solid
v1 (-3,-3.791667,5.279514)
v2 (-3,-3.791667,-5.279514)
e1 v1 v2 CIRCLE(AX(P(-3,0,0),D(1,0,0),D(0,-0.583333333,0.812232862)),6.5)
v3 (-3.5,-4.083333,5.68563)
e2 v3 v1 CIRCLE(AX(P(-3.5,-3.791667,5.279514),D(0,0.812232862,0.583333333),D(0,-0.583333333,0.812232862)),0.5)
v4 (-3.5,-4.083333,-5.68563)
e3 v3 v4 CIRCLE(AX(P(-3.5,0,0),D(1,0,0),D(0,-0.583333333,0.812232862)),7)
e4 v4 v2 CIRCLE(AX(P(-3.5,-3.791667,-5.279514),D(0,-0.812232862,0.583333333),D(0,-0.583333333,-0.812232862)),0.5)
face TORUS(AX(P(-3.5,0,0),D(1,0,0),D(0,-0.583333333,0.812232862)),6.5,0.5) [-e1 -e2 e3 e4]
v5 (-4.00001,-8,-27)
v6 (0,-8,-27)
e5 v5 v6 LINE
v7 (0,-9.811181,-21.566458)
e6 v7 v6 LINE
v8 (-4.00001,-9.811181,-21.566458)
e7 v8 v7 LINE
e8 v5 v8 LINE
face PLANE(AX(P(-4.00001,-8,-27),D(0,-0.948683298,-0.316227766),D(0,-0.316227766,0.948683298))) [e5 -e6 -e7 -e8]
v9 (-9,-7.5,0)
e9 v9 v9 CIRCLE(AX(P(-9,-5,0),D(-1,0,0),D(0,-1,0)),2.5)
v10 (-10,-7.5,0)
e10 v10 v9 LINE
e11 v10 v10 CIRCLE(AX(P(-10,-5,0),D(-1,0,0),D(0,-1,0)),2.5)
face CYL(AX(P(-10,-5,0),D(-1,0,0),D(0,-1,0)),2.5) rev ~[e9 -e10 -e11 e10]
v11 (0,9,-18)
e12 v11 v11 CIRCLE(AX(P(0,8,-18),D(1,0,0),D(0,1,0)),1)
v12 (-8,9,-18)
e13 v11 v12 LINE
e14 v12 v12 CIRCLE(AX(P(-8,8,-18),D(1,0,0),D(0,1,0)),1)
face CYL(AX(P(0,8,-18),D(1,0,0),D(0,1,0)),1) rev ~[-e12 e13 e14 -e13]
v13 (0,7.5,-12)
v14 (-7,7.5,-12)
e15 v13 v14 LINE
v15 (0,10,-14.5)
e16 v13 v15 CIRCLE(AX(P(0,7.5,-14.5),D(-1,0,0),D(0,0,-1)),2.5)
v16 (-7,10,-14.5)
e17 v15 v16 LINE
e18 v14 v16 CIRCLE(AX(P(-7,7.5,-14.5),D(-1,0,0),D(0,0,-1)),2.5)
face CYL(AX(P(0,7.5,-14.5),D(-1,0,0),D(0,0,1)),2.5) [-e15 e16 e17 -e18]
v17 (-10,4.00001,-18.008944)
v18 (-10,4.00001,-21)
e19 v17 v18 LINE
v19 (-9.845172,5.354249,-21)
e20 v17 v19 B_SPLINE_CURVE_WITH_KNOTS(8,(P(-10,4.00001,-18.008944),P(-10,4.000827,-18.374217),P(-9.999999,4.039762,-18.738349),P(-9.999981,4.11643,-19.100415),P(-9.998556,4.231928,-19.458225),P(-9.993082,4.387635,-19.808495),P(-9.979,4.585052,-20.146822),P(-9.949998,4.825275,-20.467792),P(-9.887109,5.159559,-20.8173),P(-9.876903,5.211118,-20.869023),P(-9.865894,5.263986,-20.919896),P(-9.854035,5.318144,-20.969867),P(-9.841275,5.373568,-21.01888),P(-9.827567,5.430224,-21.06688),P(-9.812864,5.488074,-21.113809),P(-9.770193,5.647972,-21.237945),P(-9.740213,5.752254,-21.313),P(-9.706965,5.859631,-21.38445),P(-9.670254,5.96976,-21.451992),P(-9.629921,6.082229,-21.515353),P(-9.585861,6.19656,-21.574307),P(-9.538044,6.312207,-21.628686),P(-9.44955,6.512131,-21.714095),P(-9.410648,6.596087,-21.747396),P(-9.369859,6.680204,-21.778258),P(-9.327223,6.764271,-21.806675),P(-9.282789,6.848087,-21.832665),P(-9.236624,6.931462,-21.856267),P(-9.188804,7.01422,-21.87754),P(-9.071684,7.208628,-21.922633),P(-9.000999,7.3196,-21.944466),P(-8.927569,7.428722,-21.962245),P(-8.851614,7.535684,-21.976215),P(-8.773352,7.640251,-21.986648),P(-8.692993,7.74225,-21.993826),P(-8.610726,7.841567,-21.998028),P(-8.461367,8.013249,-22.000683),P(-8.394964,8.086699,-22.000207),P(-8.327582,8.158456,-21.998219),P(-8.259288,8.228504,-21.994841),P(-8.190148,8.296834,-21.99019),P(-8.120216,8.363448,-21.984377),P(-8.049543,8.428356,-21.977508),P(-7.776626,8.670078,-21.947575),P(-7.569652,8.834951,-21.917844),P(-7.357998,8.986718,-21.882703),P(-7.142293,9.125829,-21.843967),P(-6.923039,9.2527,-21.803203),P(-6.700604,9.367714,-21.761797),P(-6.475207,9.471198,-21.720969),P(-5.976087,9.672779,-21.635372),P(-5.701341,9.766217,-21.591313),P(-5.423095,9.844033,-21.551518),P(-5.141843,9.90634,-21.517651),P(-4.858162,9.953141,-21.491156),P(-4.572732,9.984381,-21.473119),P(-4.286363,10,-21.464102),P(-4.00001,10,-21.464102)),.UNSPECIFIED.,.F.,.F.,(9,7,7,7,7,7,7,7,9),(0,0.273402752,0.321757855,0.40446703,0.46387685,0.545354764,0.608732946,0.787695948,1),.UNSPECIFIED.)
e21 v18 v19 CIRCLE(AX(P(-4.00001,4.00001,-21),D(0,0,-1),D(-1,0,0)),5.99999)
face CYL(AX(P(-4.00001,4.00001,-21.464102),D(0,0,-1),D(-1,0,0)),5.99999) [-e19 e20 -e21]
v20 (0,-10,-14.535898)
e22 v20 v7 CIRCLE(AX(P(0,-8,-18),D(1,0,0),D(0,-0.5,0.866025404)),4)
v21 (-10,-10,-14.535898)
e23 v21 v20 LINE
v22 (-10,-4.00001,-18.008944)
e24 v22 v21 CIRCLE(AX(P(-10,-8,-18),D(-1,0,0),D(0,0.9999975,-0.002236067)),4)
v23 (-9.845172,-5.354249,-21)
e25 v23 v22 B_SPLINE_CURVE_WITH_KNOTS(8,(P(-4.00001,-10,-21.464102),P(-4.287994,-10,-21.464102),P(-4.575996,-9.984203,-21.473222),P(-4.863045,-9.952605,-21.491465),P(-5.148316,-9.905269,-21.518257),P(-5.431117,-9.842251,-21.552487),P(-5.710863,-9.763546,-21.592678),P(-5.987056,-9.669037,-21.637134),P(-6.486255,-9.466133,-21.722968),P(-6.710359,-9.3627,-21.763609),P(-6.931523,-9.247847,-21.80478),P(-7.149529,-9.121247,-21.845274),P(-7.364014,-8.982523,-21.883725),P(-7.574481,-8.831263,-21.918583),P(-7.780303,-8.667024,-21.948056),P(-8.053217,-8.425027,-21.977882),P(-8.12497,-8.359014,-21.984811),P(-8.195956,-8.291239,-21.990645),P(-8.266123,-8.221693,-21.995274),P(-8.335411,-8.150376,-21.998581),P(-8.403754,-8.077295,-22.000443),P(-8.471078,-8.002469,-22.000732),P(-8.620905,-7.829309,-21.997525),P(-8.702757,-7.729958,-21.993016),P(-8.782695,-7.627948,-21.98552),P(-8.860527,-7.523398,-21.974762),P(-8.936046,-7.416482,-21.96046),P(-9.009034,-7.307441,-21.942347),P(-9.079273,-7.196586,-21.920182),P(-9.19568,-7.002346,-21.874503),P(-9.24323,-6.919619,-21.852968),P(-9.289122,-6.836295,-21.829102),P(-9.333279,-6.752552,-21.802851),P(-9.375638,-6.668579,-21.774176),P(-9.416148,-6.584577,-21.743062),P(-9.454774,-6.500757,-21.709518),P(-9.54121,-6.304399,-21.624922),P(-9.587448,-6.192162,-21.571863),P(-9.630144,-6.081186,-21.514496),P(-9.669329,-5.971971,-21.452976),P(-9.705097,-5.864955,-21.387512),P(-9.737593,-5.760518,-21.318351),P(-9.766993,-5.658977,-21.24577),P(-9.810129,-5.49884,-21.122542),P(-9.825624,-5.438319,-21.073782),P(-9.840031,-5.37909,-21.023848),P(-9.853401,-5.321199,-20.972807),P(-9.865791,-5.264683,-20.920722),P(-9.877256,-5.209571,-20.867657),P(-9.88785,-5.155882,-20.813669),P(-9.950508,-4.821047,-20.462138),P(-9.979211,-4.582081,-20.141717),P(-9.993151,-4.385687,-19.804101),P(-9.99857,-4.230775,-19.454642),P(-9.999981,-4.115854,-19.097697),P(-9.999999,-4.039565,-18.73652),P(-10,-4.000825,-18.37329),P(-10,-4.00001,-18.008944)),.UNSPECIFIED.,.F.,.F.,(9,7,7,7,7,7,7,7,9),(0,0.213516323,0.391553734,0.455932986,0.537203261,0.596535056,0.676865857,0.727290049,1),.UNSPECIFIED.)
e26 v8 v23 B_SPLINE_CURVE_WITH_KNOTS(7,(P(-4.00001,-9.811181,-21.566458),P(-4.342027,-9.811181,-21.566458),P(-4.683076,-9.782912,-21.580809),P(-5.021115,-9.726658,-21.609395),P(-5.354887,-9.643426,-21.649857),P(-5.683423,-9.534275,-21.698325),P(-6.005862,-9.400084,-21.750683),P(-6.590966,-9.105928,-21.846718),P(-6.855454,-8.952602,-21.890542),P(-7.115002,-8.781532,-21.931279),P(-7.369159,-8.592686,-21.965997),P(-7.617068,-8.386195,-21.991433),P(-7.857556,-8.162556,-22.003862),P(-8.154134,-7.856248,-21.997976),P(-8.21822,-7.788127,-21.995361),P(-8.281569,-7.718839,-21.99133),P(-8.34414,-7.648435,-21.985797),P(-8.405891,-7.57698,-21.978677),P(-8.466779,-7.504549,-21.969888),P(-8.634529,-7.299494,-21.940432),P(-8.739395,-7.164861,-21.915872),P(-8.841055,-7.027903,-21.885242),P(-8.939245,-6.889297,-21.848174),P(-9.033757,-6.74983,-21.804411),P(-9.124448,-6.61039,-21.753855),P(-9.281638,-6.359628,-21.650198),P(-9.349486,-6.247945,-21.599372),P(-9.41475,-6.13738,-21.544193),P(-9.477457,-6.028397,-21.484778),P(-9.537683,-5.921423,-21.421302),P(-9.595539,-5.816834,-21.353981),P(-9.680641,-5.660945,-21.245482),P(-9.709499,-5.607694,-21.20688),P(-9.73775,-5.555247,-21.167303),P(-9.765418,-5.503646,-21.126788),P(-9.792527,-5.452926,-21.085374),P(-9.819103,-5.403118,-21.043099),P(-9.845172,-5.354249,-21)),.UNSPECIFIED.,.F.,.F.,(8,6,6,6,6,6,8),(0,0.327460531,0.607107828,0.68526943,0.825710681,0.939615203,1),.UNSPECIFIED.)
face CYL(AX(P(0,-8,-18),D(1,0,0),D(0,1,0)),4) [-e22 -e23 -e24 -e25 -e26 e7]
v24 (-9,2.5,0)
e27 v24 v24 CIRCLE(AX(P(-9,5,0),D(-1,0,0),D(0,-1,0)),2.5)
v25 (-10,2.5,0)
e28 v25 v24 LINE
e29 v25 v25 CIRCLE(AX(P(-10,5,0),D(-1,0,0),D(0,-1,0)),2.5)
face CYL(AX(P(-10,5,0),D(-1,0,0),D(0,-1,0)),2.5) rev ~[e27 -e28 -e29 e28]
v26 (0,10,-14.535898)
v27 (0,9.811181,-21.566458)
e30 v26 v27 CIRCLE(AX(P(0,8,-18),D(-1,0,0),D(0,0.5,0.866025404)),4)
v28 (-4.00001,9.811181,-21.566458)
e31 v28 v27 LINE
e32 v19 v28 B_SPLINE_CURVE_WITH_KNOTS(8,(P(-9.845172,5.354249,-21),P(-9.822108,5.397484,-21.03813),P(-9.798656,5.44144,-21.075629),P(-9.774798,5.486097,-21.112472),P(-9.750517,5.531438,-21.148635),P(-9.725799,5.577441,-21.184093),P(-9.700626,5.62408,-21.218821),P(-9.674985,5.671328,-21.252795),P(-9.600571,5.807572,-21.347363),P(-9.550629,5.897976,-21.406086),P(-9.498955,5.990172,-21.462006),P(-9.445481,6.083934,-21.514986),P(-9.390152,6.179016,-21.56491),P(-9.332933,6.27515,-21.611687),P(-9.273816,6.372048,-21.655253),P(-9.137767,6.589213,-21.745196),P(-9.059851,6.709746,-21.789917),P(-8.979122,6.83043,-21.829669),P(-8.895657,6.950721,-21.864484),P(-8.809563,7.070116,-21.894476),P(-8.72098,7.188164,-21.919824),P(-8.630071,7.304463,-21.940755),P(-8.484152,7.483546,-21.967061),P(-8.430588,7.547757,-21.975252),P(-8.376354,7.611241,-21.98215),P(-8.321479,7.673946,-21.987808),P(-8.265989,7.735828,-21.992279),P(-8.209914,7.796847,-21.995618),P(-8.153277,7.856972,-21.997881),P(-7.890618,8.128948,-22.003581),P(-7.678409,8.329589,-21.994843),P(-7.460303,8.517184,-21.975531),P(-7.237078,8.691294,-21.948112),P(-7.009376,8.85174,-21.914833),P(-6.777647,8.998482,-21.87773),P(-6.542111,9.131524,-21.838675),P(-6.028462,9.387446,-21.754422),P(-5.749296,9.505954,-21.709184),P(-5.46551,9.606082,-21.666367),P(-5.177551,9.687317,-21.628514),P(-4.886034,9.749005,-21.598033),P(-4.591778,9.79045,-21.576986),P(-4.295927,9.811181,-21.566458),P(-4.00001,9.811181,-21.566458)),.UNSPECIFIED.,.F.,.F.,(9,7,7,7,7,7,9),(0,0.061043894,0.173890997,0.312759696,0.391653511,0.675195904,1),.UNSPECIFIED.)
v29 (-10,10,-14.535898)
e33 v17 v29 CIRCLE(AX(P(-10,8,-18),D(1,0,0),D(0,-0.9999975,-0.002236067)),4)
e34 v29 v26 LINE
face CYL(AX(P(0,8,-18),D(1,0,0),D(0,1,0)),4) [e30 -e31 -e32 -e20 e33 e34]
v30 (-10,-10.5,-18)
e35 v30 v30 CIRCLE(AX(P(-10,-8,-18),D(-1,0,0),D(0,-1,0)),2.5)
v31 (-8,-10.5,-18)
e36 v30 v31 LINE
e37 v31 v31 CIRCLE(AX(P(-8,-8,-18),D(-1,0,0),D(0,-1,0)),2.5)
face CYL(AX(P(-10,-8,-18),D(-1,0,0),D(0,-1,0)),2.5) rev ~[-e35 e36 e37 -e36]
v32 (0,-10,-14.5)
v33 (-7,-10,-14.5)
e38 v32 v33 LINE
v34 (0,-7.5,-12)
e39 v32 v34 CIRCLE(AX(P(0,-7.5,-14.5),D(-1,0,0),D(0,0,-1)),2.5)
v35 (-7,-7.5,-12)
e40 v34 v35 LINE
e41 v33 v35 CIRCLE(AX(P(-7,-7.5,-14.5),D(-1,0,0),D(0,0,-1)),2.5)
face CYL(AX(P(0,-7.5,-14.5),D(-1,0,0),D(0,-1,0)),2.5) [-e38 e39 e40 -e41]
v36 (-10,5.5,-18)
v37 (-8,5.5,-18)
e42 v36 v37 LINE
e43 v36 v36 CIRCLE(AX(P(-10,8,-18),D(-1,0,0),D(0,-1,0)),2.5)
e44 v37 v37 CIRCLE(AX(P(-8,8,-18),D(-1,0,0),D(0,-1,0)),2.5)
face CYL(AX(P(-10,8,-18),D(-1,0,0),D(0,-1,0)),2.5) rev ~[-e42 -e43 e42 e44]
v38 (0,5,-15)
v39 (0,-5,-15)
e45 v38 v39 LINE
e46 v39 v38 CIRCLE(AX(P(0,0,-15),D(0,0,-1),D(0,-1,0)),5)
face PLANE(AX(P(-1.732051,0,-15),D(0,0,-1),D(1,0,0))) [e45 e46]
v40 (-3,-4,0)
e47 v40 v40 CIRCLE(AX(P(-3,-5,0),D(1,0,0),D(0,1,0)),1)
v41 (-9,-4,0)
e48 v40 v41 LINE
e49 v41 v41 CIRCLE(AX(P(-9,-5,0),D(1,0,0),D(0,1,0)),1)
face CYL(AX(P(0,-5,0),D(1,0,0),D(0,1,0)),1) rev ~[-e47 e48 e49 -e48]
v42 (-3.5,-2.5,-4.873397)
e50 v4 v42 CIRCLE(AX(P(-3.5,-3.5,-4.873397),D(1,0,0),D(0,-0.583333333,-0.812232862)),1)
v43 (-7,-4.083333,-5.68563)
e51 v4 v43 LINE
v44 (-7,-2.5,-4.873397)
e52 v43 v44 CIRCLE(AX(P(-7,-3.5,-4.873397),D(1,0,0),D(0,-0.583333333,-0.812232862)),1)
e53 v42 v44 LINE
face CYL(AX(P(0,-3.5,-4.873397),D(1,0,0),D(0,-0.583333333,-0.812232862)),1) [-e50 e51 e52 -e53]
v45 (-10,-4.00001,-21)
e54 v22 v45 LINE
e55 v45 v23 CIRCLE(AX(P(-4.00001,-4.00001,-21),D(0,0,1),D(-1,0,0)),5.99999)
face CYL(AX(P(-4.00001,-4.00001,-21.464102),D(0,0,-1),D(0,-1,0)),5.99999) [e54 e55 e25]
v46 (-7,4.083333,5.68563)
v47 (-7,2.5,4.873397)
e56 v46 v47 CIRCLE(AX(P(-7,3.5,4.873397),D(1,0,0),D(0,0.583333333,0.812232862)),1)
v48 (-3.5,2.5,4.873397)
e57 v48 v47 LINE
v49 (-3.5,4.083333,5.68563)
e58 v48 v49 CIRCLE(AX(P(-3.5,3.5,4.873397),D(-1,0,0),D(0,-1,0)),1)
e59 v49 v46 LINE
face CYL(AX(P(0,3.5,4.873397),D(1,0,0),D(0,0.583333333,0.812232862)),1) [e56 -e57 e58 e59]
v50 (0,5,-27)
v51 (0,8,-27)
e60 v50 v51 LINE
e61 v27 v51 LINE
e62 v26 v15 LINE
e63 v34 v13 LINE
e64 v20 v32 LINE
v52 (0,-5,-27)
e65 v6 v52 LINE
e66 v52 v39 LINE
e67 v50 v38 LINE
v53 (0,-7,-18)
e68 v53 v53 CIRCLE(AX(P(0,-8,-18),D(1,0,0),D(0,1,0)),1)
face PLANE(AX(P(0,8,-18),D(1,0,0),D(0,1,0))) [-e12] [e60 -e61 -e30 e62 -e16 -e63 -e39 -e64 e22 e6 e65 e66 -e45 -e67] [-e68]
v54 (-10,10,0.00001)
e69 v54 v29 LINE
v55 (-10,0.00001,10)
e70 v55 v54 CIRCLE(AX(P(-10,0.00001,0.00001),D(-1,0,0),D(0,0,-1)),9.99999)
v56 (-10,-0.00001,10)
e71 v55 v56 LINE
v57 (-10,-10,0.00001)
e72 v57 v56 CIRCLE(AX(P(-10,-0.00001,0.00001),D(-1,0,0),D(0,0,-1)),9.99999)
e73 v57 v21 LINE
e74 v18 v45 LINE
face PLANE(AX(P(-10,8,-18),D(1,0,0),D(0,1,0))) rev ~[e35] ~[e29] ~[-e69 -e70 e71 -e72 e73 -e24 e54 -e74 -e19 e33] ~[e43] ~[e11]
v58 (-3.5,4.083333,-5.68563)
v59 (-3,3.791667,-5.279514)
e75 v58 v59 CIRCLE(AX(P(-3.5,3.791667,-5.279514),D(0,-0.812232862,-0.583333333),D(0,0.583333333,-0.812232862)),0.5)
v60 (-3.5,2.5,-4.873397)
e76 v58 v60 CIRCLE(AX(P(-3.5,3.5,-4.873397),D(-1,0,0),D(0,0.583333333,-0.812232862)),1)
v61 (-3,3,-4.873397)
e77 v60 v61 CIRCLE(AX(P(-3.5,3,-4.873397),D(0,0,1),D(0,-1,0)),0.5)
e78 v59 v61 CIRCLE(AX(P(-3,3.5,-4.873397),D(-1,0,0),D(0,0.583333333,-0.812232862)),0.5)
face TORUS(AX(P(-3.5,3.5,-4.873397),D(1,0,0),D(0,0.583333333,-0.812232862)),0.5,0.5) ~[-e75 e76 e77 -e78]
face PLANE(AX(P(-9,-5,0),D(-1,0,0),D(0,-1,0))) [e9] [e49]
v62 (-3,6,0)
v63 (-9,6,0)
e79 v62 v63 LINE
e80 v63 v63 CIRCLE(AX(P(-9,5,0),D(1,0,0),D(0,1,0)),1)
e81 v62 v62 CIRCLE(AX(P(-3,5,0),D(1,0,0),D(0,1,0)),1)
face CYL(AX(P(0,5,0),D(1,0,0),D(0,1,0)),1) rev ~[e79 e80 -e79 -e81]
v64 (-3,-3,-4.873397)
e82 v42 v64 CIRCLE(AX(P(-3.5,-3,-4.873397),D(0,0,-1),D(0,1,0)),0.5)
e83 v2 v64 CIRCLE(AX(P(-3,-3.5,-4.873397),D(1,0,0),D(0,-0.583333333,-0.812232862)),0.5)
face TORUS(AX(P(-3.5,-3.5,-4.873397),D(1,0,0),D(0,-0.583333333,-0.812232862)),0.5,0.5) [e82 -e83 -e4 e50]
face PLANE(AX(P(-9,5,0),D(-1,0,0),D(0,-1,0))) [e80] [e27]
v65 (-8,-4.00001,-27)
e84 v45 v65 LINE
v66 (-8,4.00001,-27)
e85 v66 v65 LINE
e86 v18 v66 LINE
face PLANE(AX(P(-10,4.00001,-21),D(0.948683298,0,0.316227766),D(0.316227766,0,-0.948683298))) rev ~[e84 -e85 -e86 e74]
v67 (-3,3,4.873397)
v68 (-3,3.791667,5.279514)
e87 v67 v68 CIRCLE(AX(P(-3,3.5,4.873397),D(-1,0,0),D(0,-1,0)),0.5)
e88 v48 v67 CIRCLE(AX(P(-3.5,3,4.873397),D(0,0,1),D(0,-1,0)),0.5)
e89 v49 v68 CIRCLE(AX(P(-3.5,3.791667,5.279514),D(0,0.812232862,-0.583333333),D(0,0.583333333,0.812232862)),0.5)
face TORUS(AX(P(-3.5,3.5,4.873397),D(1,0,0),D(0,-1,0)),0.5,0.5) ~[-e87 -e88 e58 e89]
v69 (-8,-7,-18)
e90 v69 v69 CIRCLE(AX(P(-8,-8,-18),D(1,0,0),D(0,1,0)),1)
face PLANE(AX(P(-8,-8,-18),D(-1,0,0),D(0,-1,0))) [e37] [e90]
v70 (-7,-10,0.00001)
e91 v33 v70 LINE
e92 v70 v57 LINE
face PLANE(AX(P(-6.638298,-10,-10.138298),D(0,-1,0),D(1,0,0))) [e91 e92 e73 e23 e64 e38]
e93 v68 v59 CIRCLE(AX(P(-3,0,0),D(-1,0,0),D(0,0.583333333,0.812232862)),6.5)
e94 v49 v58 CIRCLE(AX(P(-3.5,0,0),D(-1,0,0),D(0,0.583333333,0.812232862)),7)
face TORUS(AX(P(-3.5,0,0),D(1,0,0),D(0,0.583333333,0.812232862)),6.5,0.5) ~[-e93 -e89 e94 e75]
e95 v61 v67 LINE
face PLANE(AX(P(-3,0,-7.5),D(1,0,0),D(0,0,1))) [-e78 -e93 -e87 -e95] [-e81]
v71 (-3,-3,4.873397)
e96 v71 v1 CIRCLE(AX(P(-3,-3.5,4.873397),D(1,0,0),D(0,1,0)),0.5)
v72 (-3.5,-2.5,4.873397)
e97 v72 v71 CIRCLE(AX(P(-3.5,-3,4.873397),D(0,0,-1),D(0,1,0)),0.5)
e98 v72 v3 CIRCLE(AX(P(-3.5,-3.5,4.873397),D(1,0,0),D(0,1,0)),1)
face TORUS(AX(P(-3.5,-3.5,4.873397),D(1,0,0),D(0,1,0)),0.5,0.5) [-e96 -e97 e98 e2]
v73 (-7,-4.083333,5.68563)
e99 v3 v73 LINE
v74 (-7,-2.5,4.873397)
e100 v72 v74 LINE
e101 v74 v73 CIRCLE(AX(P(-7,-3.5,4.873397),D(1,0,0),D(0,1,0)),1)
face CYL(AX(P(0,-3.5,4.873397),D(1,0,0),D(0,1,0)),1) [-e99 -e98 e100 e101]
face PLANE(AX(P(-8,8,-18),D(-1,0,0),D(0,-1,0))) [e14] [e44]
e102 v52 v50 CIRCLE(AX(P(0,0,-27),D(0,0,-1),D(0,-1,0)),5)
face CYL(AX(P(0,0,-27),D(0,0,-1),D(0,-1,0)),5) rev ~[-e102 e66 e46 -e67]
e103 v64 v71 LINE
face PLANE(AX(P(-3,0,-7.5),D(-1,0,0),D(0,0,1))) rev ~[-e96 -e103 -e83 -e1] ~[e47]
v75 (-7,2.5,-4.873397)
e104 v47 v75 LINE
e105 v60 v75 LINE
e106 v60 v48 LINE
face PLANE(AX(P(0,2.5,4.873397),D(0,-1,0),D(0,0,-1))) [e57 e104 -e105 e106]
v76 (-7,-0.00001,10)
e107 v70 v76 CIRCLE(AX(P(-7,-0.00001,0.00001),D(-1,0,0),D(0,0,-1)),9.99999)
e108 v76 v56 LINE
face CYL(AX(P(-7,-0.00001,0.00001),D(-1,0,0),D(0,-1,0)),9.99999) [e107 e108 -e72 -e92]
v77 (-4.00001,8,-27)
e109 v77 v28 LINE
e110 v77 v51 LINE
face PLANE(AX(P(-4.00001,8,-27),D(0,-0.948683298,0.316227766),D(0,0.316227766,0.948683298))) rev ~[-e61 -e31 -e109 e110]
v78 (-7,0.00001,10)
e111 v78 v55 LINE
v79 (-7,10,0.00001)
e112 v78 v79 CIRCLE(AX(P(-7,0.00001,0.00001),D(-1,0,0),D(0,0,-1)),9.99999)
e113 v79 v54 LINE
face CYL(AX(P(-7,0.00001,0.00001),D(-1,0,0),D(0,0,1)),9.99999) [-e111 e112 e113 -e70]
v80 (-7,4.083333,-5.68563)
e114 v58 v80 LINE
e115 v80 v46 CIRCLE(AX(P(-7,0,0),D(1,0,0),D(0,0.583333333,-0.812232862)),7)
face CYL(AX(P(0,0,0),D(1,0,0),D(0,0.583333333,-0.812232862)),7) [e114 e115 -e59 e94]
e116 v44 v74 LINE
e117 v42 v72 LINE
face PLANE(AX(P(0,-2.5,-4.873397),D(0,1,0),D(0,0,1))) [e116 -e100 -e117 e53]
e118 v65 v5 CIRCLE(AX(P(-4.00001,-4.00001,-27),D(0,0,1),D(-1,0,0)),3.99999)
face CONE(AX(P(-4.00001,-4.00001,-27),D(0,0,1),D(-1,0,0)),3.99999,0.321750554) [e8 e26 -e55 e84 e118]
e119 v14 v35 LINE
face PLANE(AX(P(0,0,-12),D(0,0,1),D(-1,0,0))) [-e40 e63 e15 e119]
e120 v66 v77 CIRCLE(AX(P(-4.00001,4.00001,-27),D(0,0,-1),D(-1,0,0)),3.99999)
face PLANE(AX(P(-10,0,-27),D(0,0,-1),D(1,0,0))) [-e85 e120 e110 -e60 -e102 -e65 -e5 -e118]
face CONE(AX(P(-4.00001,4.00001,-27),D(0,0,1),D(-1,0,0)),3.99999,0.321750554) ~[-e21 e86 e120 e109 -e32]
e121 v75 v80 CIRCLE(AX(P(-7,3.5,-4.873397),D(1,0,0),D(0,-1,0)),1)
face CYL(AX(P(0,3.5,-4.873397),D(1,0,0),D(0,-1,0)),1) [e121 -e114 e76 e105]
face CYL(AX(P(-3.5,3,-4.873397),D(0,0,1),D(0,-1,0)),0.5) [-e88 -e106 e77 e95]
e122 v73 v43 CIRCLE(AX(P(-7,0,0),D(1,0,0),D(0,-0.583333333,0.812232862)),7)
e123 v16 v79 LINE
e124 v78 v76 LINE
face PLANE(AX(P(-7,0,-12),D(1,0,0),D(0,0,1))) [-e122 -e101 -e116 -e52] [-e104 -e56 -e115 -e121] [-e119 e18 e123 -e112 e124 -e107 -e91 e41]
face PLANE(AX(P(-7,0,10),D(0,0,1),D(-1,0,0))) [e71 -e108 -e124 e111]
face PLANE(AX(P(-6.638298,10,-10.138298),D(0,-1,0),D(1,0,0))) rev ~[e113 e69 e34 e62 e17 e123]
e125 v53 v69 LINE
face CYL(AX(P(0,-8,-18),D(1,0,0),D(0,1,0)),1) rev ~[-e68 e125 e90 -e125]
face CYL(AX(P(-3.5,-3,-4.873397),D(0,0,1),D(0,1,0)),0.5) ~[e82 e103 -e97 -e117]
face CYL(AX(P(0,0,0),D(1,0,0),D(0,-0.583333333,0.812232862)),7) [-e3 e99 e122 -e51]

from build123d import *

# Parameters (mm, degrees)
F0_R          = 1
F2_DEPTH      = 7
F3_DEPTH      = 10
F3_DEPTH_BACK = 10
F4_W          = 3
F4_H          = 15
F5_DEPTH      = 10
F5_DEPTH_BACK = 10
F6_R          = 0.5
F7_DEPTH      = 25
F8_R          = 4
F8_R_2        = 2.5
F8_R_3        = 1
F9_DEPTH      = 10
F11_DEPTH     = 12
F12_R         = 2.5
F13_DEPTH     = 2
F14_DEPTH     = 25
F15_R         = 5.99999
F16_T1_DEPTH  = 8.00002
F16_T6_ANGLE  = 90
F16_S7_R      = 4
F16_T8_DEPTH  = 7
F16_T12_ANGLE = 90
F16_S13_R     = 4
F16_T14_DEPTH = 7
F16_T18_DEPTH = 19.5703760639
F16_S19_R     = 4
F16_T20_DEPTH = 12
F16_T24_DEPTH = 19.5703760639
F16_S25_R     = 4
F16_T26_DEPTH = 12
F17_R         = 9.99999
F18_R         = 2.5
F18_R_2       = 1
F19_DEPTH     = 1
F20_R         = 2.5


# Not quite as in the source:
# - a fillet or chamfer that OpenCascade refuses, or shapes differently, is made with other operations: its cross-section is extruded or revolved along the edge and cut away or added
# - a fillet or chamfer is up to 0.001 mm smaller than in the source, because OpenCascade refuses the exact size


with BuildPart() as f2:
    # F0 (on Right) → F2 (new body)
    with BuildSketch(Plane.YZ):
        with BuildLine():
            ThreePointArc((-2.5, 4.8733971724), (-3.0435645354, 5.7631536934), (-4.0833333333, 5.6856300345))
            ThreePointArc((-4.0833333333, 5.6856300345), (-7, 0), (-4.0833333333, -5.6856300345))
            ThreePointArc((-4.0833333333, -5.6856300345), (-3.0435645354, -5.7631536934), (-2.5, -4.8733971724))
            Line((-2.5, -4.8733971724), (-2.5, 0))
            Line((-2.5, 0), (-2.5, 4.8733971724))
        make_face()
        with Locations((-5, 0)):
            Circle(F0_R, mode=Mode.SUBTRACT)
    extrude(amount=-F2_DEPTH)



with BuildPart() as f2b:
    # F0 (on Right) → F2, piece 2 (new body)
    with BuildSketch(Plane.YZ):
        with BuildLine():
            Line((2.5, 4.8733971724), (2.5, 0))
            Line((2.5, 0), (2.5, -4.8733971724))
            ThreePointArc((2.5, -4.8733971724), (3.0435645354, -5.7631536934), (4.0833333333, -5.6856300345))
            ThreePointArc((4.0833333333, -5.6856300345), (7, 0), (4.0833333333, 5.6856300345))
            ThreePointArc((4.0833333333, 5.6856300345), (3.0435645354, 5.7631536934), (2.5, 4.8733971724))
        make_face()
        with Locations((5, 0)):
            Circle(F0_R, mode=Mode.SUBTRACT)
    extrude(amount=-F2_DEPTH)


with BuildPart() as f2_1:
    add(f2.part)

    add(f2b.part)  # F3 merges F2b
    # F1 (on Front) → F3 (join, two sides)
    with BuildSketch(Plane.XZ) as f3_sk:
        Polygon((0, -12), (-7, -12), (-7, 10), (-10, 10), (-10, -27), (0, -27), align=None)
    extrude(amount=F3_DEPTH)
    extrude(f3_sk.sketch, amount=-F3_DEPTH_BACK)

    # F4 (on Front) → F5 (cut, two sides)
    with BuildSketch(Plane.XZ) as f5_sk:
        with Locations((-1.5, 0)):
            Rectangle(F4_W, F4_H)
    extrude(amount=-F5_DEPTH, mode=Mode.SUBTRACT)
    extrude(f5_sk.sketch, amount=F5_DEPTH_BACK, mode=Mode.SUBTRACT)

    # F6
    f6_edges = [f2_1.edges().sort_by_distance(p)[0] for p in [
        (-3, -7, 0),
        (-3, 2.5, 0),
        (-3, -3.043565, 5.763154),
        (-3, -3.043565, -5.763154),
        (-3, -2.5, 0),
        (-3, 7, 0),
        (-3, 3.043565, -5.763154),
        (-3, 3.043565, 5.763154),
    ]]
    fillet(f6_edges, radius=F6_R)

    # F0 (on Right) → F7 (cut)
    with BuildSketch(Plane.YZ):
        with Locations((-8, -18)):
            Circle(F0_R)
        with Locations((8, -18)):
            Circle(F0_R)
    extrude(amount=-F7_DEPTH, mode=Mode.SUBTRACT)

    # F8 (on Right) → F9 (join)
    with BuildSketch(Plane.YZ):
        with Locations((8, -18)):
            Circle(F8_R)
        with Locations((8, -18)):
            Circle(F8_R_2, mode=Mode.SUBTRACT)
        with Locations((-8, -18)):
            Circle(F8_R)
        with Locations((-8, -18)):
            Circle(F8_R_2, mode=Mode.SUBTRACT)
        with Locations((8, -18)):
            Circle(F8_R_2)
        with Locations((8, -18)):
            Circle(F8_R_3, mode=Mode.SUBTRACT)
        with Locations((-8, -18)):
            Circle(F8_R_2)
        with Locations((-8, -18)):
            Circle(F8_R_3, mode=Mode.SUBTRACT)
    extrude(amount=-F9_DEPTH)

    # F10 (on face) → F11 (cut)
    with BuildSketch(Plane(origin=(0, 0, -27), x_dir=(1, 0, 0), z_dir=(0, 0, -1))):
        with BuildLine():
            Line((0, -5), (0, 5))
            ThreePointArc((0, 5), (-5, 0), (0, -5))
        make_face()
    extrude(amount=-F11_DEPTH, mode=Mode.SUBTRACT)

    # F12 (on face) → F13 (cut)
    with BuildSketch(Plane(origin=(-10, 0, 0), x_dir=(0, -1, 0), z_dir=(-1, 0, 0))):
        with Locations((-8, -18)):
            Circle(F12_R)
        with Locations((8, -18)):
            Circle(F12_R)
    extrude(amount=-F13_DEPTH, mode=Mode.SUBTRACT)

    # F0 (on Right) → F14 (cut)
    with BuildSketch(Plane.YZ):
        with Locations((-5, 0)):
            Circle(F0_R)
        with Locations((5, 0)):
            Circle(F0_R)
    extrude(amount=-F14_DEPTH, mode=Mode.SUBTRACT)

    # F15 (radius 6 in the source; OpenCascade refuses exactly that, so slightly less here)
    f15_edges = [f2_1.edges().sort_by_distance(p)[0] for p in [
        (-10, 10, -24.232051),
        (-10, -10, -24.232051),
    ]]
    fillet(f15_edges, radius=F15_R)

    # F16: chamfer of 2 x 6 on 5 edges, made by hand

    # F16_s2 → F16_t1 (cut)
    with BuildSketch(Plane.XZ.offset(-4.00001)):
        Polygon((-10, -21), (-8, -27), (-10, -27), align=None)
    extrude(amount=F16_T1_DEPTH, mode=Mode.SUBTRACT)


with BuildPart() as f16_tool4:
    # F16_s5 → F16_t6 (revolve)
    with BuildSketch(Plane.XZ.offset(-4.00001)):
        Polygon((-8, -27), (-10, -21), (-10, -27), align=None)
    revolve(axis=Axis((-4.00001, 4.00001, -27), (0, 0, -1)), revolution_arc=F16_T6_ANGLE)

    # F16_s7 → F16_t8 (cut, symmetric)
    with BuildSketch(Plane.YZ.offset(-7)):
        with Locations((8, -18)):
            Circle(F16_S7_R)
    extrude(amount=F16_T8_DEPTH, both=True, mode=Mode.SUBTRACT)


with BuildPart() as f2_2:
    add(f2_1.part)

    # F16_t3: cut F16_tool4
    add(f16_tool4.part, mode=Mode.SUBTRACT)


with BuildPart() as f16_tool10:
    # F16_s11 → F16_t12 (revolve)
    with BuildSketch(Plane.XZ.offset(4.00001)):
        Polygon((-8, -27), (-10, -21), (-10, -27), align=None)
    revolve(axis=Axis((-4.00001, -4.00001, -27), (0, 0, 1)), revolution_arc=F16_T12_ANGLE)

    # F16_s13 → F16_t14 (cut, symmetric)
    with BuildSketch(Plane.YZ.offset(-7)):
        with Locations((-8, -18)):
            Circle(F16_S13_R)
    extrude(amount=F16_T14_DEPTH, both=True, mode=Mode.SUBTRACT)


with BuildPart() as f2_3:
    add(f2_2.part)

    # F16_t9: cut F16_tool10
    add(f16_tool10.part, mode=Mode.SUBTRACT)


with BuildPart() as f16_tool16:
    # F16_s17 → F16_t18 (new body)
    with BuildSketch(Plane.YZ.offset(-4.00001)):
        Polygon((-8, -27), (-10, -21), (-10, -27), align=None)
    extrude(amount=F16_T18_DEPTH)

    # F16_s19 → F16_t20 (cut, symmetric)
    with BuildSketch(Plane.YZ.offset(5.8)):
        with Locations((-8, -18)):
            Circle(F16_S19_R)
    extrude(amount=F16_T20_DEPTH, both=True, mode=Mode.SUBTRACT)


with BuildPart() as f2_4:
    add(f2_3.part)

    # F16_t15: cut F16_tool16
    add(f16_tool16.part, mode=Mode.SUBTRACT)


with BuildPart() as f16_tool22:
    # F16_s23 → F16_t24 (new body)
    with BuildSketch(Plane.YZ.offset(-4.00001)):
        Polygon((8, -27), (10, -21), (10, -27), align=None)
    extrude(amount=F16_T24_DEPTH)

    # F16_s25 → F16_t26 (cut, symmetric)
    with BuildSketch(Plane.YZ.offset(5.8)):
        with Locations((8, -18)):
            Circle(F16_S25_R)
    extrude(amount=F16_T26_DEPTH, both=True, mode=Mode.SUBTRACT)


with BuildPart() as f2_5:
    add(f2_4.part)

    # F16_t21: cut F16_tool22
    add(f16_tool22.part, mode=Mode.SUBTRACT)

    # F17 (radius 10 in the source; OpenCascade refuses exactly that, so slightly less here)
    f17_edges = [f2_5.edges().sort_by_distance(p)[0] for p in [
        (-8.5, -10, 10),
        (-8.5, 10, 10),
    ]]
    fillet(f17_edges, radius=F17_R)

    # F18 (on face) → F19 (cut)
    with BuildSketch(Plane(origin=(-10, 0, 0), x_dir=(0, -1, 0), z_dir=(-1, 0, 0))):
        with Locations((-5, 0)):
            Circle(F18_R)
        with Locations((-5, 0)):
            Circle(F18_R_2, mode=Mode.SUBTRACT)
        with Locations((5, 0)):
            Circle(F18_R)
        with Locations((5, 0)):
            Circle(F18_R_2, mode=Mode.SUBTRACT)
    extrude(amount=-F19_DEPTH, mode=Mode.SUBTRACT)

    # F20
    f20_edges = [f2_5.edges().sort_by_distance(p)[0] for p in [
        (-3.5, 10, -12),
        (-3.5, -10, -12),
    ]]
    fillet(f20_edges, radius=F20_R)


solid = f2_5.part
